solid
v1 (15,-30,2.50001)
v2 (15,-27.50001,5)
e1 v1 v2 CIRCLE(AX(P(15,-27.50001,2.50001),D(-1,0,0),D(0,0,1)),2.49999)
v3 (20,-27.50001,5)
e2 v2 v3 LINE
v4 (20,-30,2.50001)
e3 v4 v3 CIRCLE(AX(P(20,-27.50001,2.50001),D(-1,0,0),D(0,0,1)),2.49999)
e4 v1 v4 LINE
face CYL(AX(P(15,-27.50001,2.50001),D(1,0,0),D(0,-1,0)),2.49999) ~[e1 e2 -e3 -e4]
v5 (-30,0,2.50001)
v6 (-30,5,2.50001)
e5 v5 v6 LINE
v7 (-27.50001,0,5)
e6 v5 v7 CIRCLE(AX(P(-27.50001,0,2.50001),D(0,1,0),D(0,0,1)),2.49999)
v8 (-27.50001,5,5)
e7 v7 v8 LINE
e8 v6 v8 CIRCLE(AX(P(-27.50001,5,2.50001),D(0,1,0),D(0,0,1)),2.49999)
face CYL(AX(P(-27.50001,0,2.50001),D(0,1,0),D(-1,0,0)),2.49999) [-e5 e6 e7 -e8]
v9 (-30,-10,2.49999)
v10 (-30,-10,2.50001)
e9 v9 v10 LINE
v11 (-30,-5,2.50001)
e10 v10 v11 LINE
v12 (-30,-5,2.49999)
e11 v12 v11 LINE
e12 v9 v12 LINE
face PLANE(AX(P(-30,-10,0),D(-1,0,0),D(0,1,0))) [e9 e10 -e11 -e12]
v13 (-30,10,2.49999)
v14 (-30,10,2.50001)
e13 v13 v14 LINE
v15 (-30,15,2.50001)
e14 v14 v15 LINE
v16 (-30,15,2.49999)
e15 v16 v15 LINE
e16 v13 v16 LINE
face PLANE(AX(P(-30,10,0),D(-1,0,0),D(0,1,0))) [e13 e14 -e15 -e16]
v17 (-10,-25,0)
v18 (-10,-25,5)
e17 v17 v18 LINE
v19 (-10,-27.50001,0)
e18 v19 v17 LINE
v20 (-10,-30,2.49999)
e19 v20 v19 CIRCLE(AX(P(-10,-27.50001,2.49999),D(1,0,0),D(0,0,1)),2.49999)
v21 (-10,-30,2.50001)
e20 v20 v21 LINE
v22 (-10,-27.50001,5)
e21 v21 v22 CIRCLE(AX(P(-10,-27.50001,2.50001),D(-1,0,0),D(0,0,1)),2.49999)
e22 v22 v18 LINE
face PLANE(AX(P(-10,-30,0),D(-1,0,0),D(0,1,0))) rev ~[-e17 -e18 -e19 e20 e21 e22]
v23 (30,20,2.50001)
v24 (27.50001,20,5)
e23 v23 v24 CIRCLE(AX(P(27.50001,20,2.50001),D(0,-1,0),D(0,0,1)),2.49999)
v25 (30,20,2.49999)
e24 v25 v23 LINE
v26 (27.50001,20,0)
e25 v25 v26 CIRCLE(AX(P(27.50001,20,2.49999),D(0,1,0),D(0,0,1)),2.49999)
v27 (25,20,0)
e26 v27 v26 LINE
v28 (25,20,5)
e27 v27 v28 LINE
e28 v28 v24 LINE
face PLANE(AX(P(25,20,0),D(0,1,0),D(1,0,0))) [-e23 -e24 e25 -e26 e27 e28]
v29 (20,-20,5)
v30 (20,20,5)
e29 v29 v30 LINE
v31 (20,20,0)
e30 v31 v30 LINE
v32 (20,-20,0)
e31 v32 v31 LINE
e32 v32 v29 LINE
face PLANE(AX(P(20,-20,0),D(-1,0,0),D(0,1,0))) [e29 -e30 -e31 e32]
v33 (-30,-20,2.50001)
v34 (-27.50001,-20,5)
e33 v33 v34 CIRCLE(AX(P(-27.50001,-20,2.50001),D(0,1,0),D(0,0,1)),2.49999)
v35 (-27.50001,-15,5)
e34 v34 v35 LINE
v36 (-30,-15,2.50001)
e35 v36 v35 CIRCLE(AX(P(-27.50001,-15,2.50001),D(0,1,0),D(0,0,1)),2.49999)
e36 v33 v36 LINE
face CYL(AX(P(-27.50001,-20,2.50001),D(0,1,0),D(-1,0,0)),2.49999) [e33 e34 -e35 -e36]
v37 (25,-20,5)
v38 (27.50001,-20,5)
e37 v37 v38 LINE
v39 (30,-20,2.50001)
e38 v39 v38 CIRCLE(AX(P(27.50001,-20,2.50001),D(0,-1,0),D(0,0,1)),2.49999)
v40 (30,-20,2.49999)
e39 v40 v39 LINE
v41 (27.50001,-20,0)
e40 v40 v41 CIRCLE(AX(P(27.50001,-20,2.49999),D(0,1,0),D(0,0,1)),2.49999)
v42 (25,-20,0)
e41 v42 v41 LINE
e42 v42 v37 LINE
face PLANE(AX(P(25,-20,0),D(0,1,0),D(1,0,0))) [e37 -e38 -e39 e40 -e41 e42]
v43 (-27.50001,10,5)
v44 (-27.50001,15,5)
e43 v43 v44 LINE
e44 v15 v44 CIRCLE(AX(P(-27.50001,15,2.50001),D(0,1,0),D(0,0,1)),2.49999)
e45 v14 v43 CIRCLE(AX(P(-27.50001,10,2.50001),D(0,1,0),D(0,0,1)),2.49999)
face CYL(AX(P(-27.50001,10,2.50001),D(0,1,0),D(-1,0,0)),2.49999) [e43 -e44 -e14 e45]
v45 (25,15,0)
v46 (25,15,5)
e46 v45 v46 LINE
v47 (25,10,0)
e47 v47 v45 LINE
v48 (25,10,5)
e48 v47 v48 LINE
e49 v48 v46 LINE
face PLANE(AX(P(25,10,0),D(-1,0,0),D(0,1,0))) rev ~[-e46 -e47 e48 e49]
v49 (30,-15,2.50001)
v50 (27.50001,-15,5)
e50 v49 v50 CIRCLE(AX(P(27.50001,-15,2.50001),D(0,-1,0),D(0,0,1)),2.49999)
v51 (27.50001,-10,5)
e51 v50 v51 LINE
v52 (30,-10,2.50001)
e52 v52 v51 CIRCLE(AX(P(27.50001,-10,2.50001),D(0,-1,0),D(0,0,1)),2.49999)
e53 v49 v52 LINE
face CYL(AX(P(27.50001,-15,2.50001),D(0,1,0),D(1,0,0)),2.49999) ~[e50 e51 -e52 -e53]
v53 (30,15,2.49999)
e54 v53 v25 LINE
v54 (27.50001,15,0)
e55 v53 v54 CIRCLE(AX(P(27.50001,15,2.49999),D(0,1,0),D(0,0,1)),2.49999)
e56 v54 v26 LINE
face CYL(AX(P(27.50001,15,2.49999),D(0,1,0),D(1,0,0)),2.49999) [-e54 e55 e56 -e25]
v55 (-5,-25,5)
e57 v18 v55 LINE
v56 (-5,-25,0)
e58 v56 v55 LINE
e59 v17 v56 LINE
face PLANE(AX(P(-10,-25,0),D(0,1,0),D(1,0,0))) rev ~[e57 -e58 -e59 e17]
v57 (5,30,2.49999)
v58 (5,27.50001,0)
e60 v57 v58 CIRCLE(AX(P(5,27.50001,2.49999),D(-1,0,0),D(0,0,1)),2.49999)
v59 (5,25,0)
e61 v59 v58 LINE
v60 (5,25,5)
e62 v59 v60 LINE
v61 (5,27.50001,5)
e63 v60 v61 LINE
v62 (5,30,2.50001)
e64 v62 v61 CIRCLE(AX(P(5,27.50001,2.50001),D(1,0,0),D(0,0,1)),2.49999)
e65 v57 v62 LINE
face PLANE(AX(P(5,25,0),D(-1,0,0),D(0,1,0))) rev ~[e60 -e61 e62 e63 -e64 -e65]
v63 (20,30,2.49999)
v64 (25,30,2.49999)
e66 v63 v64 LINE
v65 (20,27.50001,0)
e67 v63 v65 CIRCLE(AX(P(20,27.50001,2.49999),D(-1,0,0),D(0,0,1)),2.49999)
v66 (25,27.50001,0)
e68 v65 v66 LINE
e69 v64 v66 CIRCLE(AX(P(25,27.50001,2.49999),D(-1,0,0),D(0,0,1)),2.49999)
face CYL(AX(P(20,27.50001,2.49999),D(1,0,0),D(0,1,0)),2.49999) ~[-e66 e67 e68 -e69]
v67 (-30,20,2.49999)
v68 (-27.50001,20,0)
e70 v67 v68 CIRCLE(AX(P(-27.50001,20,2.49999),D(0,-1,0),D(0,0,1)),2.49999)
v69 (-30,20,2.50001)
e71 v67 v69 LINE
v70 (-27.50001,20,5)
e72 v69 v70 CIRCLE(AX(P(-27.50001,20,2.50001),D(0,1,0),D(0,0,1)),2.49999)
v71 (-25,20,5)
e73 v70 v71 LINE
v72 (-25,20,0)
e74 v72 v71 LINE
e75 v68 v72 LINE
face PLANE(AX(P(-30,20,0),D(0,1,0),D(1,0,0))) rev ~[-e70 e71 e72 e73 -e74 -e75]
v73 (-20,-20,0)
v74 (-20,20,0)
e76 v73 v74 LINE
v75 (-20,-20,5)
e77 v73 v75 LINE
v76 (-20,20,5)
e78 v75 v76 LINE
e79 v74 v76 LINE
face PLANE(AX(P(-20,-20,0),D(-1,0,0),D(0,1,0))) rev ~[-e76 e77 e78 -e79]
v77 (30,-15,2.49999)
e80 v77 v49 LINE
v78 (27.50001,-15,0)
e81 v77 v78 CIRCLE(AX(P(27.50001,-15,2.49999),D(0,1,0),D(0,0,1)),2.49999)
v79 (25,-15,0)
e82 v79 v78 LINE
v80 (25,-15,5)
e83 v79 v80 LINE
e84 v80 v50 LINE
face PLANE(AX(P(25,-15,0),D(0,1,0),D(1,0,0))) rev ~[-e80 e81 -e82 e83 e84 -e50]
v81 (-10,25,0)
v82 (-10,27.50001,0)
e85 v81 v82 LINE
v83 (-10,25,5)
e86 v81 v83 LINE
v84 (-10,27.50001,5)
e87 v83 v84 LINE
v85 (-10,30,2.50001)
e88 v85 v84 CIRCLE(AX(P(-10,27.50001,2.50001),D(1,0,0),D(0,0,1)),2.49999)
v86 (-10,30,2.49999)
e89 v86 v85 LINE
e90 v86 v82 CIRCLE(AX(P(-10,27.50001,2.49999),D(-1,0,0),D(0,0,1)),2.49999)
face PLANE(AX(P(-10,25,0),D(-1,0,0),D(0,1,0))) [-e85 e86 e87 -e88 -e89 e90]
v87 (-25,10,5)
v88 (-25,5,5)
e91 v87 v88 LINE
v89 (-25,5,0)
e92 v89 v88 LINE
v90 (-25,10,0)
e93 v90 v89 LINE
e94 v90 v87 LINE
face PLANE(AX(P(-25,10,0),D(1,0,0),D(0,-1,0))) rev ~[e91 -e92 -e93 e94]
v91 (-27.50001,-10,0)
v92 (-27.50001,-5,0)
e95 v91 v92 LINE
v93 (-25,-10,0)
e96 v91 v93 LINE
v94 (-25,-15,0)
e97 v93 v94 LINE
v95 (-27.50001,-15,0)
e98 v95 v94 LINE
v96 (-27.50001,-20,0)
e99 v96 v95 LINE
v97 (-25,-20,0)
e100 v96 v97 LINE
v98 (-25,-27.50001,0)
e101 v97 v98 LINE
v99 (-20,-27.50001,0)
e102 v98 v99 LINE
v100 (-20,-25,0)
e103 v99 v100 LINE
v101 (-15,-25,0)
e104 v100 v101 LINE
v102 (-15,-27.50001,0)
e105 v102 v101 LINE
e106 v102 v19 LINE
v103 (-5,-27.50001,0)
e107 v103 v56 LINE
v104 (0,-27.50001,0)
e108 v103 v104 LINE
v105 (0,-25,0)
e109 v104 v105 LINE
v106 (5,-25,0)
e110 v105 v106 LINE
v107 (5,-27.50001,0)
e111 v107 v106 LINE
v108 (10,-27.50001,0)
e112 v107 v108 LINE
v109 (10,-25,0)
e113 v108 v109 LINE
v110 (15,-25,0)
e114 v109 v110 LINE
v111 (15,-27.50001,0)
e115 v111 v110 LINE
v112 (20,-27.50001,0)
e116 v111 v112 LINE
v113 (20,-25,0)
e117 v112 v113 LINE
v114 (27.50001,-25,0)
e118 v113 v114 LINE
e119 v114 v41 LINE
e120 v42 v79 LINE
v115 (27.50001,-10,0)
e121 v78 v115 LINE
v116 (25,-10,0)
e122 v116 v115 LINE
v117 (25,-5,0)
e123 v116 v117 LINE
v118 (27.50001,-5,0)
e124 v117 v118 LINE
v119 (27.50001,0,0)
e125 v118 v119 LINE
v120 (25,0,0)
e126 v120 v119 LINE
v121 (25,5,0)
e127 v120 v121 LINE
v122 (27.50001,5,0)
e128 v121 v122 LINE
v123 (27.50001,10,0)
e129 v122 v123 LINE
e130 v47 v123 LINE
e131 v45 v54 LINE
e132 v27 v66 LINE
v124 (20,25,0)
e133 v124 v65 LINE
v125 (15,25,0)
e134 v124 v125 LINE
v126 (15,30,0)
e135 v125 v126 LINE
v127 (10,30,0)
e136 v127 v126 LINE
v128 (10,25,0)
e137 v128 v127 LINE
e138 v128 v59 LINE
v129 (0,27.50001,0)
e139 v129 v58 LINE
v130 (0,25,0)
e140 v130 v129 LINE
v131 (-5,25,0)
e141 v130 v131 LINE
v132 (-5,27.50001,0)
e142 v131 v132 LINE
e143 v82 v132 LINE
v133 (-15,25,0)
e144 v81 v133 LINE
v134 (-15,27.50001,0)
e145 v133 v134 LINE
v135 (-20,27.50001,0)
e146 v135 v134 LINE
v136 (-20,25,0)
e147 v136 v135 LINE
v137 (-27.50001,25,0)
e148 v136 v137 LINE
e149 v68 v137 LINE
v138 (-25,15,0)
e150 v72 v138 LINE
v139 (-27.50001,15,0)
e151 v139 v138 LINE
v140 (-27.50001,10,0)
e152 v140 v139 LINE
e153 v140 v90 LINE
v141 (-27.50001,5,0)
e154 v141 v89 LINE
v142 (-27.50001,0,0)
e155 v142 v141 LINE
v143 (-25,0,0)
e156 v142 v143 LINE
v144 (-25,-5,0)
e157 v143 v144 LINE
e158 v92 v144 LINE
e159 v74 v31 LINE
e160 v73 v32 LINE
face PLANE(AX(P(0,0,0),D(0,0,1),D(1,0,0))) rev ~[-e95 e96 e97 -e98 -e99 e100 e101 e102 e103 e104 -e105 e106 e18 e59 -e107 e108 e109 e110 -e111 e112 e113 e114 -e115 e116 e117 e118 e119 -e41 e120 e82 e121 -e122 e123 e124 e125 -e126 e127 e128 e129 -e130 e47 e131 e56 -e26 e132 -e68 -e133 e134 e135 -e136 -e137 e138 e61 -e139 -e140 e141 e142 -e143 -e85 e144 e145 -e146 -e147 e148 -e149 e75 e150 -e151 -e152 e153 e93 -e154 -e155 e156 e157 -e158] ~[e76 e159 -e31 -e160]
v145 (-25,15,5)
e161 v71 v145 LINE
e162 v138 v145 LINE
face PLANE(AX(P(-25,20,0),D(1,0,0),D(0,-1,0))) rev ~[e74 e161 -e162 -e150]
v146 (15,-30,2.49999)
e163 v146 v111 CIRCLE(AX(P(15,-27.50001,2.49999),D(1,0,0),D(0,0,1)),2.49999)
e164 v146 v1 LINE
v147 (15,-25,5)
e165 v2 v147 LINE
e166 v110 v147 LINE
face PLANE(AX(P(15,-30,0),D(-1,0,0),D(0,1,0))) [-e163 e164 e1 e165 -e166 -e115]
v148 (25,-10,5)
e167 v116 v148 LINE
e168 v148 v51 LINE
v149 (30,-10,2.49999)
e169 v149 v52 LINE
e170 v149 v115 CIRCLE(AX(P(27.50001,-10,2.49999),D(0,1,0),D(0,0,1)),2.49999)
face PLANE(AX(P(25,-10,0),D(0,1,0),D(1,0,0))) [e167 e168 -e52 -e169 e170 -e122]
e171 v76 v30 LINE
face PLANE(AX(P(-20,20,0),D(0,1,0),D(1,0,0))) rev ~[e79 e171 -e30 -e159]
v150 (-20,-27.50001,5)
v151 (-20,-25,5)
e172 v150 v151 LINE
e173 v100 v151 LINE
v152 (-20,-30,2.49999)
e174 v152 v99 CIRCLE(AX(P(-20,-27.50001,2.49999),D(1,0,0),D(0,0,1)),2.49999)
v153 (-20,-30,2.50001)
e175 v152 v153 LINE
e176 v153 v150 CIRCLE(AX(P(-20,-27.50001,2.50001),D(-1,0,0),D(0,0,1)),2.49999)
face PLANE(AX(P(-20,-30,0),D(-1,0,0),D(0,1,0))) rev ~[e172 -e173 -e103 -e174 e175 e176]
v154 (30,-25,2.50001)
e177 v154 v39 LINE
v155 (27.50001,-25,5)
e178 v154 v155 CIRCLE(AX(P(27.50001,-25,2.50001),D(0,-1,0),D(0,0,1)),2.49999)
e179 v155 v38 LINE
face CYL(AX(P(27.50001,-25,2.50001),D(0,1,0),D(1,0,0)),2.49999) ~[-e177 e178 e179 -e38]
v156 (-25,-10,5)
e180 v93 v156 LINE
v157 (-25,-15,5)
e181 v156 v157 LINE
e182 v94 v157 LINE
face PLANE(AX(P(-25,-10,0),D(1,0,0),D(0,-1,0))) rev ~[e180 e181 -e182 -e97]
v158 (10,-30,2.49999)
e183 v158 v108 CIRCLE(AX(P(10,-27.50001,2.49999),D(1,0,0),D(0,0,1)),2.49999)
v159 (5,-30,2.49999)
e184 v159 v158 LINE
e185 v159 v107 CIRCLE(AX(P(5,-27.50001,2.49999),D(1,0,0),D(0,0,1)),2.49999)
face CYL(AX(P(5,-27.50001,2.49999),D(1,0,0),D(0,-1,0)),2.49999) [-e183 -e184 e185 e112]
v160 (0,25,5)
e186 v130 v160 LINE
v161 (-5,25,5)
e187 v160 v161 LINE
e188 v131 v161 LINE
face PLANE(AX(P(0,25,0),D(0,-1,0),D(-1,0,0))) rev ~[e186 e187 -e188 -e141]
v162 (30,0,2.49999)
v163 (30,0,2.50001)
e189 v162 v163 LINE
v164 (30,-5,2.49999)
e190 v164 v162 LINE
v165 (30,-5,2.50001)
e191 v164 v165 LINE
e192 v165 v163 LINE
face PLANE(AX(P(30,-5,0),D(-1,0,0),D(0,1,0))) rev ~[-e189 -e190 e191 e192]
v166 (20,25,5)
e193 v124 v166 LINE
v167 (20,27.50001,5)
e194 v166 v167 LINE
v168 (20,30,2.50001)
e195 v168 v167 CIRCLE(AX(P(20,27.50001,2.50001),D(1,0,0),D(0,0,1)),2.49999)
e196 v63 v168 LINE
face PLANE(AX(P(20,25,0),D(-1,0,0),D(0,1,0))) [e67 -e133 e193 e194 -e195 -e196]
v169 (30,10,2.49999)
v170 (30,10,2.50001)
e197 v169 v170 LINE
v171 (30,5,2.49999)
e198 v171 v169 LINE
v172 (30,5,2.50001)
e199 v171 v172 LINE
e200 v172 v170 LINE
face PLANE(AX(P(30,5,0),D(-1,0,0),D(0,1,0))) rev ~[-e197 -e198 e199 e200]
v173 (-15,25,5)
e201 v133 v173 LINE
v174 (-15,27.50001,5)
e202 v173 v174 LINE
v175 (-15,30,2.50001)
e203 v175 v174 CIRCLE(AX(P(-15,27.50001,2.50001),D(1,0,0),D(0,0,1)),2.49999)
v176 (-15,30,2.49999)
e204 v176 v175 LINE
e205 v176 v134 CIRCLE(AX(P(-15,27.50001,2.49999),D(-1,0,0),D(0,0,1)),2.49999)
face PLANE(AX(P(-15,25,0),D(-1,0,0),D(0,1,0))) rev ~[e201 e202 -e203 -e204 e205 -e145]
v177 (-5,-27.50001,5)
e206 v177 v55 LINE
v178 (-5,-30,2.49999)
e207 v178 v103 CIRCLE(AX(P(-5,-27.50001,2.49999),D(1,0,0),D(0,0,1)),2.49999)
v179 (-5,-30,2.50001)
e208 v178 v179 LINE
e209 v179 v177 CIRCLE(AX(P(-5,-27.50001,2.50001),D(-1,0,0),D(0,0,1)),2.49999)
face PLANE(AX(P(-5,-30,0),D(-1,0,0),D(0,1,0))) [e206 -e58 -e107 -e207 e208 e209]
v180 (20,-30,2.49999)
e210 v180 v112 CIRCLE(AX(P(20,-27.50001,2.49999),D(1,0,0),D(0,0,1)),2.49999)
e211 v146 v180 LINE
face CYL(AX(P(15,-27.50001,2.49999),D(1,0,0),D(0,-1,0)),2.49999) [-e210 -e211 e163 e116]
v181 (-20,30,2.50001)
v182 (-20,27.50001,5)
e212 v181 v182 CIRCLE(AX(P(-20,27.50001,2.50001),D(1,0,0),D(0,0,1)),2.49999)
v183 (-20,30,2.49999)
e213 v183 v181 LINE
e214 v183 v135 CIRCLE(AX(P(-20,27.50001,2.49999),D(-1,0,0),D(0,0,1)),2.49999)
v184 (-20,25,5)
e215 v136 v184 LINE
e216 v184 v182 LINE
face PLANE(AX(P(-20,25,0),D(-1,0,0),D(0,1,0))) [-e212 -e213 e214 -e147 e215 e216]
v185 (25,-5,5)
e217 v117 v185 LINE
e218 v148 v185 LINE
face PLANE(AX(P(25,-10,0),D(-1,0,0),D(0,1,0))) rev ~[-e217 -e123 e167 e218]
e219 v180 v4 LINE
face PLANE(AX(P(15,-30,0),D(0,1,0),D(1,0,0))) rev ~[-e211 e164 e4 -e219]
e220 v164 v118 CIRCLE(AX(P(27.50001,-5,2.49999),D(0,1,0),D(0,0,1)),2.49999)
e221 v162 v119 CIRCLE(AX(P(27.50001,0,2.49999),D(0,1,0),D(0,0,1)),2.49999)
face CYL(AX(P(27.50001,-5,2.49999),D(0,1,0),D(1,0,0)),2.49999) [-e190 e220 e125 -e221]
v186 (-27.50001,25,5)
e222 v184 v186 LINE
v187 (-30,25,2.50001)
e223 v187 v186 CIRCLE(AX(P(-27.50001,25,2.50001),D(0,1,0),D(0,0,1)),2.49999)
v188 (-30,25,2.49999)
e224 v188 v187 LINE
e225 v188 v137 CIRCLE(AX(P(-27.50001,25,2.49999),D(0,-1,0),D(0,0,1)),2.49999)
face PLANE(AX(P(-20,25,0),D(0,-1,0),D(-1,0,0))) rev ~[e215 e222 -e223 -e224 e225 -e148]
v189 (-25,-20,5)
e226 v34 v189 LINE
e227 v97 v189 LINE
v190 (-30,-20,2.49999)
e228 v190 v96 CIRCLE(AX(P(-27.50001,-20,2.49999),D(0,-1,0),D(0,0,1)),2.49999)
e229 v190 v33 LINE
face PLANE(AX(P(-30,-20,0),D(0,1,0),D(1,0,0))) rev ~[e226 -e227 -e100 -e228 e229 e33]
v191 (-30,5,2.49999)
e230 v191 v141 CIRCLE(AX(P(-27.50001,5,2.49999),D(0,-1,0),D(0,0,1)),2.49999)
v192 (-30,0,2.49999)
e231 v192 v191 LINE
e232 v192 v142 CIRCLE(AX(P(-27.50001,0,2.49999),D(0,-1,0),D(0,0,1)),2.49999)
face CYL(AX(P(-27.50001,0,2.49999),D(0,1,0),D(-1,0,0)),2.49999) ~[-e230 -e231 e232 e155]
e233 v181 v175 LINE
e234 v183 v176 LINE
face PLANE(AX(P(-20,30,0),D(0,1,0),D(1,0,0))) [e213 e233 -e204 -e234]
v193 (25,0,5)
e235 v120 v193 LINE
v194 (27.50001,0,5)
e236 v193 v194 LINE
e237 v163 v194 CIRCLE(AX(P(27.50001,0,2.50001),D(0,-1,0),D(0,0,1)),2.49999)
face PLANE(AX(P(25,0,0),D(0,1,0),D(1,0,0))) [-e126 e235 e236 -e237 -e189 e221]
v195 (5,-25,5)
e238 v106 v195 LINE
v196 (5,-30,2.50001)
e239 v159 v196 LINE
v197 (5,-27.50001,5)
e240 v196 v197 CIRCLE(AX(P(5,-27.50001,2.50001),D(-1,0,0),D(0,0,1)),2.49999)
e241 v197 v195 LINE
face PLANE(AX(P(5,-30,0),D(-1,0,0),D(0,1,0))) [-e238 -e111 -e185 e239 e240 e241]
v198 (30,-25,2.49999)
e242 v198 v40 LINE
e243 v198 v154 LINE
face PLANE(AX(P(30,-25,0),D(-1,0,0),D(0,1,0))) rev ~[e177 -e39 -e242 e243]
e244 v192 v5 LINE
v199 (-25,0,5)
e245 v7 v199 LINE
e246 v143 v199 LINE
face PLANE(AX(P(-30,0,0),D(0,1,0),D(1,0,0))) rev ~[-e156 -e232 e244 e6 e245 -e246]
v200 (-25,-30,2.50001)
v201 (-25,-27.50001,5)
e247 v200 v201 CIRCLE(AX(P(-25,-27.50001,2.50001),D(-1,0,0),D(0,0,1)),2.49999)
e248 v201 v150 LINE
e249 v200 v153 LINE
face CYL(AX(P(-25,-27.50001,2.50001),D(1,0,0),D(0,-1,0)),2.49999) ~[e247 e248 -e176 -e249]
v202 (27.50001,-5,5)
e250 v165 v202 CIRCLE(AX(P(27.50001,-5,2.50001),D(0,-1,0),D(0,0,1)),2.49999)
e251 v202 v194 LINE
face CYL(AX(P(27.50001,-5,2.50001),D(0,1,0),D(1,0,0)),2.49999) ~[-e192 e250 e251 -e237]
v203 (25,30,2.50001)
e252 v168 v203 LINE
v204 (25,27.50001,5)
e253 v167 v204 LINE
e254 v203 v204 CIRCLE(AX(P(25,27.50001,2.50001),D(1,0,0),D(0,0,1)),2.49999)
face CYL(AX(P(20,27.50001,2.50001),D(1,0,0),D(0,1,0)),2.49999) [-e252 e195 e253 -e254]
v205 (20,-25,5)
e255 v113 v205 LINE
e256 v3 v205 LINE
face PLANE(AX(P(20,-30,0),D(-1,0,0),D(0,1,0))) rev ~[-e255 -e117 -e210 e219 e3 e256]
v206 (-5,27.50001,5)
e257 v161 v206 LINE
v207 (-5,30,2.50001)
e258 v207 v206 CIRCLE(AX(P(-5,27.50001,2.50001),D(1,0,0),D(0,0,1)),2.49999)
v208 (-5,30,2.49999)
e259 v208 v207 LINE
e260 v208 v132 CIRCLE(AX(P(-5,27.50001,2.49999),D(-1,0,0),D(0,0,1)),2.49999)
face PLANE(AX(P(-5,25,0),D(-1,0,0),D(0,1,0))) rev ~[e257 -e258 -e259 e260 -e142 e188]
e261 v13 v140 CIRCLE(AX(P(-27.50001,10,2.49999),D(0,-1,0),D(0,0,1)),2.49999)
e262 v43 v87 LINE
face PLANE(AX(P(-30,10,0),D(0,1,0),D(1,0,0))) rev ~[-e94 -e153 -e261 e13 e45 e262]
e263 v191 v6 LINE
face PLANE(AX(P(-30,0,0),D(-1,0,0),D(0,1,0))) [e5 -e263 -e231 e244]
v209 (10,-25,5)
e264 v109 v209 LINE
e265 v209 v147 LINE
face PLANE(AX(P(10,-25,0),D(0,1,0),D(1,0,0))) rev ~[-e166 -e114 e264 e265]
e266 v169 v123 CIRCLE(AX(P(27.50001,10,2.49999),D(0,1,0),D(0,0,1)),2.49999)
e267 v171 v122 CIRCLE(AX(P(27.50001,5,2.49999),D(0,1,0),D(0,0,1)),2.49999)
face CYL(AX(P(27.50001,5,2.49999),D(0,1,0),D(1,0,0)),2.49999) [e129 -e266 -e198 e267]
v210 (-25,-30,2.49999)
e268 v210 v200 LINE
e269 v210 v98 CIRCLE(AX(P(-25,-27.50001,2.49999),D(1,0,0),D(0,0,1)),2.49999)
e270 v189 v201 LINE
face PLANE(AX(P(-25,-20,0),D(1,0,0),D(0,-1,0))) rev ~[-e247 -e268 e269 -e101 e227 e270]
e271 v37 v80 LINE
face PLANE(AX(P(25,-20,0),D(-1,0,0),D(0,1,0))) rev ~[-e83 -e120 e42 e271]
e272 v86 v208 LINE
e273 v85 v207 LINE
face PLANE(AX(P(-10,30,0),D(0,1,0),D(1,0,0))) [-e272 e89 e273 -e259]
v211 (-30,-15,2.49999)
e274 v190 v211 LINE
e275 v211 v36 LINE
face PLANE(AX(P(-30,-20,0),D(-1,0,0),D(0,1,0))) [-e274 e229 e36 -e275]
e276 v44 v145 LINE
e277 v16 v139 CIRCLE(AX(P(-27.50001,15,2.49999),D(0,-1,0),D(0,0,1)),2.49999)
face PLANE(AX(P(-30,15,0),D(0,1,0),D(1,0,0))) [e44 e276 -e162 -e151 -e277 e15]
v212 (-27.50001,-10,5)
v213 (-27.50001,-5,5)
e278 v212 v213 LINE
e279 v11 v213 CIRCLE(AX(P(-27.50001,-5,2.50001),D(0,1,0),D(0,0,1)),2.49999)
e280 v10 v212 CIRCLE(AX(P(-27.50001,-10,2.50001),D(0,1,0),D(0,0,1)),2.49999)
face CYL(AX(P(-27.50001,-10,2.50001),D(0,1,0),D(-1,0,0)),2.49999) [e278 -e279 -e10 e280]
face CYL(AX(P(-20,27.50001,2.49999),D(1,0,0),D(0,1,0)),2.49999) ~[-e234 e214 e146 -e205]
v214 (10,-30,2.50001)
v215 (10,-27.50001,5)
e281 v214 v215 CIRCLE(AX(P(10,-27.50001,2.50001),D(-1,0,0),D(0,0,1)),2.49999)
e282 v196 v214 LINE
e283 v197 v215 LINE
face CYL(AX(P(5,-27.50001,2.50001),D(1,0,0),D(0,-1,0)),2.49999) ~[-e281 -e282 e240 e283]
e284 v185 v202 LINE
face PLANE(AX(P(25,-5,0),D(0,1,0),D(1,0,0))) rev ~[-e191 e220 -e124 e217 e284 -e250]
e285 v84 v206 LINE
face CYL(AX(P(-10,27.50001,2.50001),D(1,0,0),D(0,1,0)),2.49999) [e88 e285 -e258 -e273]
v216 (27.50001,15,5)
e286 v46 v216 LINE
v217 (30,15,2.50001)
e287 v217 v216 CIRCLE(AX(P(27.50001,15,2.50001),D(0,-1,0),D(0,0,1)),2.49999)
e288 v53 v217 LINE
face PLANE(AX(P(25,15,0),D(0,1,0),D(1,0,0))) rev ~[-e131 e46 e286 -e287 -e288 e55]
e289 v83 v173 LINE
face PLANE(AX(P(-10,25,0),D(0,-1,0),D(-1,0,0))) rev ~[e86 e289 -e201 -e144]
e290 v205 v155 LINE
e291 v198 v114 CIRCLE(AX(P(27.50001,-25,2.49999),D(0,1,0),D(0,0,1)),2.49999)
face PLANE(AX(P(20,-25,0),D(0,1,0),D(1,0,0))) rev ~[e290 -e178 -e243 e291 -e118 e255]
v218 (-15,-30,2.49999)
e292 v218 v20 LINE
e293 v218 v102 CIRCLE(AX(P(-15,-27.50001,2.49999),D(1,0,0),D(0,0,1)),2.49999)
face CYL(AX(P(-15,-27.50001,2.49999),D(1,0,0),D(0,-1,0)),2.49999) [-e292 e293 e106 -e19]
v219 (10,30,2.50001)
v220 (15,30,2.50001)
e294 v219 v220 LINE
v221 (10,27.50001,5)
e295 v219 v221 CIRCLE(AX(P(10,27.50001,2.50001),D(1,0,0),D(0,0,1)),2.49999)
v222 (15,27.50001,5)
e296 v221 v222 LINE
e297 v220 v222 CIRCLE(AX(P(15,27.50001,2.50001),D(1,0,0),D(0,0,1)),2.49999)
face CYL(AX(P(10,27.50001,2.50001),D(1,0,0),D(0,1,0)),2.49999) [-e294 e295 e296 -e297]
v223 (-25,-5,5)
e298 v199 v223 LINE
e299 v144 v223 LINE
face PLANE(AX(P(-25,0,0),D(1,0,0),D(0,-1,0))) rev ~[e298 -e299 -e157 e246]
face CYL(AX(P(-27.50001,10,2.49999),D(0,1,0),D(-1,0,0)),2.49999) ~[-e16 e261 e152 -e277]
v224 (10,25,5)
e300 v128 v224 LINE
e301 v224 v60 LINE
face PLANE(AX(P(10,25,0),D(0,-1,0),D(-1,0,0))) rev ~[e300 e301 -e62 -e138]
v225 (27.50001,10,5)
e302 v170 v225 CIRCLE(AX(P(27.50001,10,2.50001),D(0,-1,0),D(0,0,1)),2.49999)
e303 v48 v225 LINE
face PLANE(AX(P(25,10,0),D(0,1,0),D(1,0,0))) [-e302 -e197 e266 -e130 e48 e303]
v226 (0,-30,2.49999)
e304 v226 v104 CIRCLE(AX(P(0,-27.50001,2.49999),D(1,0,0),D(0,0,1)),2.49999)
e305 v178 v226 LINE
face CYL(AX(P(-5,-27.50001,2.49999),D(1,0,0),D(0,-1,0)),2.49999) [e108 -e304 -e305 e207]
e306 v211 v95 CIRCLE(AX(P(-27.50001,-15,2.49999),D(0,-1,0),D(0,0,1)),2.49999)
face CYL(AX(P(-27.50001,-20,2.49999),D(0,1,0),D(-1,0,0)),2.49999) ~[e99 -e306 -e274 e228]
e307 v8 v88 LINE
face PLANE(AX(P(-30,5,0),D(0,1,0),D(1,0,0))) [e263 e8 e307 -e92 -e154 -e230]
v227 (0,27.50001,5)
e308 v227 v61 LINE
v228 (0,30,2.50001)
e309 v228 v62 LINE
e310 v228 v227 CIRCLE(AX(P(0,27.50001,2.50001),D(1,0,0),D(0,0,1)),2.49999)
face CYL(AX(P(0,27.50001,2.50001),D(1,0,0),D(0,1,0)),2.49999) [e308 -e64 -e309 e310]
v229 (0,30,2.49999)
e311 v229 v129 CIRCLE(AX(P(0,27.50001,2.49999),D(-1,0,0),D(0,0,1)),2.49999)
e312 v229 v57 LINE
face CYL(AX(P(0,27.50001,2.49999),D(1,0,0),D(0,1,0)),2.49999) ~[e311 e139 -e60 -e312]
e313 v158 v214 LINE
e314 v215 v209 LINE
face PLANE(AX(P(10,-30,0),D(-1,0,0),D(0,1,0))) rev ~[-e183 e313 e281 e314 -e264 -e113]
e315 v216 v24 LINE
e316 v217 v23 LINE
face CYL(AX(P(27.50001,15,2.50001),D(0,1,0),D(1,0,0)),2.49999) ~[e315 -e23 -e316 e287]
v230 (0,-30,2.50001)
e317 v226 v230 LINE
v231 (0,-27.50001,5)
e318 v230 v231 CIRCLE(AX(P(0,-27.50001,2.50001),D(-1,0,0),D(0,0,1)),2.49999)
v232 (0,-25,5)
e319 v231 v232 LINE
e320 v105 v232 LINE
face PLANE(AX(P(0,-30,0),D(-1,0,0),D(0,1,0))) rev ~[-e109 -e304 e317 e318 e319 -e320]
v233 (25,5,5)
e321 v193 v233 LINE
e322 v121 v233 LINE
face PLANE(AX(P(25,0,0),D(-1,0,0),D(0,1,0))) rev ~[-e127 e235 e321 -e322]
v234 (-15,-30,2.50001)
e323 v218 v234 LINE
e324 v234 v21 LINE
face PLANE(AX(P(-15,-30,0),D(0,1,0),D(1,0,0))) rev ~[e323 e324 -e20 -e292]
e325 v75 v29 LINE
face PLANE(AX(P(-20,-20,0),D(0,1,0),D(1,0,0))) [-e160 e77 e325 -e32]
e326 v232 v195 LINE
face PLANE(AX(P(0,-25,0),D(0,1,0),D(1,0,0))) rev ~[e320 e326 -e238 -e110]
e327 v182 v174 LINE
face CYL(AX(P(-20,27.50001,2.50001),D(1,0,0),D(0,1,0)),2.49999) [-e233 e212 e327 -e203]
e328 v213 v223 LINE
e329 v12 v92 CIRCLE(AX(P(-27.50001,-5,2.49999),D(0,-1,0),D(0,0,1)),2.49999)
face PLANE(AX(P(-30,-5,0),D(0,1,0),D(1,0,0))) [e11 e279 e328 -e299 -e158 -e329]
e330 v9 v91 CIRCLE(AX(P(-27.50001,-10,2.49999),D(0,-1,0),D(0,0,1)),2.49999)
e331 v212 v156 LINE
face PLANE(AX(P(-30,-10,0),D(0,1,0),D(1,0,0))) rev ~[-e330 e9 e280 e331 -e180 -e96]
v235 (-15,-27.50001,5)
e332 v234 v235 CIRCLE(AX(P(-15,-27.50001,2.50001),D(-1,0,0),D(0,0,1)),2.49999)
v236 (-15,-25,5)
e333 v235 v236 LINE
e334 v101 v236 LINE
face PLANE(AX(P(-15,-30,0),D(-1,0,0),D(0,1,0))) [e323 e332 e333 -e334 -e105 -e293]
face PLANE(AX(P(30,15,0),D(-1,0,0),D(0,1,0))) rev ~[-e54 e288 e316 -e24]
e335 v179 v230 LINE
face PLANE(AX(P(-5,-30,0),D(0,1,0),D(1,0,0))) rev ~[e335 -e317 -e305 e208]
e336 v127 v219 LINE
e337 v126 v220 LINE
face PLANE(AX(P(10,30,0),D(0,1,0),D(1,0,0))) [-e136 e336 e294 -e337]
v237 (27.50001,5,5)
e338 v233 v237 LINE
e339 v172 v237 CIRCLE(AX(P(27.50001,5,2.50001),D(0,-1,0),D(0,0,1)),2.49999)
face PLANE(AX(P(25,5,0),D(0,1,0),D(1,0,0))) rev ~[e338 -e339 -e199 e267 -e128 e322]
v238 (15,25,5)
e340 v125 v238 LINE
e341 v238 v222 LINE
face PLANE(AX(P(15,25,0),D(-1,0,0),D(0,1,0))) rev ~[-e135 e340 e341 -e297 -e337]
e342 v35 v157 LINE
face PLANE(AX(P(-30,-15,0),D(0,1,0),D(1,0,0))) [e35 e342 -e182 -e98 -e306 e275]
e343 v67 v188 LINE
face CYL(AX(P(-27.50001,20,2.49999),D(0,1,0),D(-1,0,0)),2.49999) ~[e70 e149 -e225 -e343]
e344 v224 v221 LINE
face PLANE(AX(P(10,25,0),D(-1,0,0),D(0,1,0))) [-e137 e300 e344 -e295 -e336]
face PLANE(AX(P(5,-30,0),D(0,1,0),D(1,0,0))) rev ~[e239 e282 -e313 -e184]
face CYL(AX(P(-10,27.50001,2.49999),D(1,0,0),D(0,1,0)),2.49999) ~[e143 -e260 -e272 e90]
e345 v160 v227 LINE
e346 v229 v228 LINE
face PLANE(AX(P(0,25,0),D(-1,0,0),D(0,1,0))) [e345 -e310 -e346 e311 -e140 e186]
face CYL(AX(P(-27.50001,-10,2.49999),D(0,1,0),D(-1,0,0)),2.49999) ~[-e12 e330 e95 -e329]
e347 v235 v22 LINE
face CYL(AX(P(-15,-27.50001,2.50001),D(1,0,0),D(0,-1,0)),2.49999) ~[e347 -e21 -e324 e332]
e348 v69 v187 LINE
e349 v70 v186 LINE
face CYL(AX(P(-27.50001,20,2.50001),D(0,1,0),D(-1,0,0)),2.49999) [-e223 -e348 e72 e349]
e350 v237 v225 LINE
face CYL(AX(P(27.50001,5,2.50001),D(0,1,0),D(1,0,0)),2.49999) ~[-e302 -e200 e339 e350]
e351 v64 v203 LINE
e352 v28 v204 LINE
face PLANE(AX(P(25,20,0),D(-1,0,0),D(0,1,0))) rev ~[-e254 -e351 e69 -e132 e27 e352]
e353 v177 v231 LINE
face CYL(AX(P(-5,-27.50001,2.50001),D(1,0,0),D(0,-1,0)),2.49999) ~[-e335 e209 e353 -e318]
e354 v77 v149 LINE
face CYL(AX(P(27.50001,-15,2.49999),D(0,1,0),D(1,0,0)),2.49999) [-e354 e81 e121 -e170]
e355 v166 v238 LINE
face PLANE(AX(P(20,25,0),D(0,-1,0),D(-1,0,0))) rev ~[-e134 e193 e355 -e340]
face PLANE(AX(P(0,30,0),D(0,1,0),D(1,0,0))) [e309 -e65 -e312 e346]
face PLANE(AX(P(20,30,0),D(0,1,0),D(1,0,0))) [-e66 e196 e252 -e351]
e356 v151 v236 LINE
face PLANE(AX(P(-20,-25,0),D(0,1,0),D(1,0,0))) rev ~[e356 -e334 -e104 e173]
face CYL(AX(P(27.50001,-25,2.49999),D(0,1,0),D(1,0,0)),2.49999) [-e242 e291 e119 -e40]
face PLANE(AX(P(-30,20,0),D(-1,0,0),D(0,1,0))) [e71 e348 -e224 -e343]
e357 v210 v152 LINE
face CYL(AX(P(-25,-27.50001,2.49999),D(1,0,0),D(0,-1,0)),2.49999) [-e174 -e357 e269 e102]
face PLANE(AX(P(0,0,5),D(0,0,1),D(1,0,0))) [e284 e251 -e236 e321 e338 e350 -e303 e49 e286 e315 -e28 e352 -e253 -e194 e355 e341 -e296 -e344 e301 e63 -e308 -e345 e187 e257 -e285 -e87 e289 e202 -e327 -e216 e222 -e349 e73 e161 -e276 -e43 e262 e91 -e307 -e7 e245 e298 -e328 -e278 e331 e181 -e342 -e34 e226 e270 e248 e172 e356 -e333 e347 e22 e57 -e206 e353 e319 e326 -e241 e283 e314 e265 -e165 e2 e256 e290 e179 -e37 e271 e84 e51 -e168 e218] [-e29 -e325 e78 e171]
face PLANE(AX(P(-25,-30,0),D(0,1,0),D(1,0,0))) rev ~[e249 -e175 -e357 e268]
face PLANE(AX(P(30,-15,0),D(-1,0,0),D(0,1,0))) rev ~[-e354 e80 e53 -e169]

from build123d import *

# Parameters (mm, degrees)
F0_W     = 40
F0_H     = 40
F0_W_2   = 5
F0_H_2   = 5
F1_DEPTH = 5
F2_R     = 2.49999


# Not quite as in the source:
# - a fillet or chamfer is up to 0.001 mm smaller than in the source, because OpenCascade refuses the exact size


with BuildPart() as f1:
    # F0 (on Top) → F1 (new body)
    with BuildSketch(Plane.XY):
        Polygon((25, 20), (25, 25), (20, 25), (15, 25), (10, 25), (5, 25), (0, 25), (-5, 25), (-10, 25), (-15, 25), (-20, 25), (-25, 25), (-25, 20), (-25, 15), (-25, 10), (-25, 5), (-25, 0), (-25, -5), (-25, -10), (-25, -15), (-25, -20), (-25, -25), (-20, -25), (-15, -25), (-10, -25), (-5, -25), (0, -25), (5, -25), (10, -25), (15, -25), (20, -25), (25, -25), (25, -20), (25, -15), (25, -10), (25, -5), (25, 0), (25, 5), (25, 10), (25, 15), align=None)
        Rectangle(F0_W, F0_H, mode=Mode.SUBTRACT)
        with Locations((22.5, 27.5)):
            Rectangle(F0_W_2, F0_H_2)
        with Locations((27.5, 17.5)):
            Rectangle(F0_W_2, F0_H_2)
        with Locations((12.5, 27.5)):
            Rectangle(F0_W_2, F0_H_2)
        with Locations((27.5, 7.5)):
            Rectangle(F0_W_2, F0_H_2)
        with Locations((2.5, 27.5)):
            Rectangle(F0_W_2, F0_H_2)
        with Locations((27.5, -2.5)):
            Rectangle(F0_W_2, F0_H_2)
        with Locations((-7.5, 27.5)):
            Rectangle(F0_W_2, F0_H_2)
        with Locations((27.5, -12.5)):
            Rectangle(F0_W_2, F0_H_2)
        with Locations((-17.5, 27.5)):
            Rectangle(F0_W_2, F0_H_2)
        with Locations((27.5, -22.5)):
            Rectangle(F0_W_2, F0_H_2)
        with Locations((-27.5, 22.5)):
            Rectangle(F0_W_2, F0_H_2)
        with Locations((17.5, -27.5)):
            Rectangle(F0_W_2, F0_H_2)
        with Locations((-27.5, 12.5)):
            Rectangle(F0_W_2, F0_H_2)
        with Locations((7.5, -27.5)):
            Rectangle(F0_W_2, F0_H_2)
        with Locations((-27.5, 2.5)):
            Rectangle(F0_W_2, F0_H_2)
        with Locations((-2.5, -27.5)):
            Rectangle(F0_W_2, F0_H_2)
        with Locations((-27.5, -7.5)):
            Rectangle(F0_W_2, F0_H_2)
        with Locations((-12.5, -27.5)):
            Rectangle(F0_W_2, F0_H_2)
        with Locations((-27.5, -17.5)):
            Rectangle(F0_W_2, F0_H_2)
        with Locations((-22.5, -27.5)):
            Rectangle(F0_W_2, F0_H_2)
    extrude(amount=F1_DEPTH)

    # F2 (radius 2.5 in the source; OpenCascade refuses exactly that, so slightly less here)
    f2_edges = [f1.edges().sort_by_distance(p)[0] for p in [
        (-30, 22.5, 5),
        (-30, 22.5, 0),
        (-30, 12.5, 5),
        (-30, 12.5, 0),
        (-30, 2.5, 0),
        (-30, 2.5, 5),
        (-30, -7.5, 0),
        (-30, -7.5, 5),
        (-30, -17.5, 5),
        (-30, -17.5, 0),
        (-22.5, -30, 5),
        (-22.5, -30, 0),
        (-12.5, -30, 5),
        (-12.5, -30, 0),
        (-2.5, -30, 0),
        (-2.5, -30, 5),
        (7.5, -30, 5),
        (7.5, -30, 0),
        (17.5, -30, 0),
        (17.5, -30, 5),
        (30, -22.5, 5),
        (30, -22.5, 0),
        (30, -12.5, 5),
        (30, -12.5, 0),
        (30, -2.5, 5),
        (30, -2.5, 0),
        (30, 7.5, 5),
        (30, 7.5, 0),
        (30, 17.5, 5),
        (30, 17.5, 0),
        (22.5, 30, 5),
        (22.5, 30, 0),
        (12.5, 30, 5),
        (2.5, 30, 5),
        (2.5, 30, 0),
        (-7.5, 30, 5),
        (-7.5, 30, 0),
        (-17.5, 30, 5),
        (-17.5, 30, 0),
    ]]
    fillet(f2_edges, radius=F2_R)


solid = f1.part
